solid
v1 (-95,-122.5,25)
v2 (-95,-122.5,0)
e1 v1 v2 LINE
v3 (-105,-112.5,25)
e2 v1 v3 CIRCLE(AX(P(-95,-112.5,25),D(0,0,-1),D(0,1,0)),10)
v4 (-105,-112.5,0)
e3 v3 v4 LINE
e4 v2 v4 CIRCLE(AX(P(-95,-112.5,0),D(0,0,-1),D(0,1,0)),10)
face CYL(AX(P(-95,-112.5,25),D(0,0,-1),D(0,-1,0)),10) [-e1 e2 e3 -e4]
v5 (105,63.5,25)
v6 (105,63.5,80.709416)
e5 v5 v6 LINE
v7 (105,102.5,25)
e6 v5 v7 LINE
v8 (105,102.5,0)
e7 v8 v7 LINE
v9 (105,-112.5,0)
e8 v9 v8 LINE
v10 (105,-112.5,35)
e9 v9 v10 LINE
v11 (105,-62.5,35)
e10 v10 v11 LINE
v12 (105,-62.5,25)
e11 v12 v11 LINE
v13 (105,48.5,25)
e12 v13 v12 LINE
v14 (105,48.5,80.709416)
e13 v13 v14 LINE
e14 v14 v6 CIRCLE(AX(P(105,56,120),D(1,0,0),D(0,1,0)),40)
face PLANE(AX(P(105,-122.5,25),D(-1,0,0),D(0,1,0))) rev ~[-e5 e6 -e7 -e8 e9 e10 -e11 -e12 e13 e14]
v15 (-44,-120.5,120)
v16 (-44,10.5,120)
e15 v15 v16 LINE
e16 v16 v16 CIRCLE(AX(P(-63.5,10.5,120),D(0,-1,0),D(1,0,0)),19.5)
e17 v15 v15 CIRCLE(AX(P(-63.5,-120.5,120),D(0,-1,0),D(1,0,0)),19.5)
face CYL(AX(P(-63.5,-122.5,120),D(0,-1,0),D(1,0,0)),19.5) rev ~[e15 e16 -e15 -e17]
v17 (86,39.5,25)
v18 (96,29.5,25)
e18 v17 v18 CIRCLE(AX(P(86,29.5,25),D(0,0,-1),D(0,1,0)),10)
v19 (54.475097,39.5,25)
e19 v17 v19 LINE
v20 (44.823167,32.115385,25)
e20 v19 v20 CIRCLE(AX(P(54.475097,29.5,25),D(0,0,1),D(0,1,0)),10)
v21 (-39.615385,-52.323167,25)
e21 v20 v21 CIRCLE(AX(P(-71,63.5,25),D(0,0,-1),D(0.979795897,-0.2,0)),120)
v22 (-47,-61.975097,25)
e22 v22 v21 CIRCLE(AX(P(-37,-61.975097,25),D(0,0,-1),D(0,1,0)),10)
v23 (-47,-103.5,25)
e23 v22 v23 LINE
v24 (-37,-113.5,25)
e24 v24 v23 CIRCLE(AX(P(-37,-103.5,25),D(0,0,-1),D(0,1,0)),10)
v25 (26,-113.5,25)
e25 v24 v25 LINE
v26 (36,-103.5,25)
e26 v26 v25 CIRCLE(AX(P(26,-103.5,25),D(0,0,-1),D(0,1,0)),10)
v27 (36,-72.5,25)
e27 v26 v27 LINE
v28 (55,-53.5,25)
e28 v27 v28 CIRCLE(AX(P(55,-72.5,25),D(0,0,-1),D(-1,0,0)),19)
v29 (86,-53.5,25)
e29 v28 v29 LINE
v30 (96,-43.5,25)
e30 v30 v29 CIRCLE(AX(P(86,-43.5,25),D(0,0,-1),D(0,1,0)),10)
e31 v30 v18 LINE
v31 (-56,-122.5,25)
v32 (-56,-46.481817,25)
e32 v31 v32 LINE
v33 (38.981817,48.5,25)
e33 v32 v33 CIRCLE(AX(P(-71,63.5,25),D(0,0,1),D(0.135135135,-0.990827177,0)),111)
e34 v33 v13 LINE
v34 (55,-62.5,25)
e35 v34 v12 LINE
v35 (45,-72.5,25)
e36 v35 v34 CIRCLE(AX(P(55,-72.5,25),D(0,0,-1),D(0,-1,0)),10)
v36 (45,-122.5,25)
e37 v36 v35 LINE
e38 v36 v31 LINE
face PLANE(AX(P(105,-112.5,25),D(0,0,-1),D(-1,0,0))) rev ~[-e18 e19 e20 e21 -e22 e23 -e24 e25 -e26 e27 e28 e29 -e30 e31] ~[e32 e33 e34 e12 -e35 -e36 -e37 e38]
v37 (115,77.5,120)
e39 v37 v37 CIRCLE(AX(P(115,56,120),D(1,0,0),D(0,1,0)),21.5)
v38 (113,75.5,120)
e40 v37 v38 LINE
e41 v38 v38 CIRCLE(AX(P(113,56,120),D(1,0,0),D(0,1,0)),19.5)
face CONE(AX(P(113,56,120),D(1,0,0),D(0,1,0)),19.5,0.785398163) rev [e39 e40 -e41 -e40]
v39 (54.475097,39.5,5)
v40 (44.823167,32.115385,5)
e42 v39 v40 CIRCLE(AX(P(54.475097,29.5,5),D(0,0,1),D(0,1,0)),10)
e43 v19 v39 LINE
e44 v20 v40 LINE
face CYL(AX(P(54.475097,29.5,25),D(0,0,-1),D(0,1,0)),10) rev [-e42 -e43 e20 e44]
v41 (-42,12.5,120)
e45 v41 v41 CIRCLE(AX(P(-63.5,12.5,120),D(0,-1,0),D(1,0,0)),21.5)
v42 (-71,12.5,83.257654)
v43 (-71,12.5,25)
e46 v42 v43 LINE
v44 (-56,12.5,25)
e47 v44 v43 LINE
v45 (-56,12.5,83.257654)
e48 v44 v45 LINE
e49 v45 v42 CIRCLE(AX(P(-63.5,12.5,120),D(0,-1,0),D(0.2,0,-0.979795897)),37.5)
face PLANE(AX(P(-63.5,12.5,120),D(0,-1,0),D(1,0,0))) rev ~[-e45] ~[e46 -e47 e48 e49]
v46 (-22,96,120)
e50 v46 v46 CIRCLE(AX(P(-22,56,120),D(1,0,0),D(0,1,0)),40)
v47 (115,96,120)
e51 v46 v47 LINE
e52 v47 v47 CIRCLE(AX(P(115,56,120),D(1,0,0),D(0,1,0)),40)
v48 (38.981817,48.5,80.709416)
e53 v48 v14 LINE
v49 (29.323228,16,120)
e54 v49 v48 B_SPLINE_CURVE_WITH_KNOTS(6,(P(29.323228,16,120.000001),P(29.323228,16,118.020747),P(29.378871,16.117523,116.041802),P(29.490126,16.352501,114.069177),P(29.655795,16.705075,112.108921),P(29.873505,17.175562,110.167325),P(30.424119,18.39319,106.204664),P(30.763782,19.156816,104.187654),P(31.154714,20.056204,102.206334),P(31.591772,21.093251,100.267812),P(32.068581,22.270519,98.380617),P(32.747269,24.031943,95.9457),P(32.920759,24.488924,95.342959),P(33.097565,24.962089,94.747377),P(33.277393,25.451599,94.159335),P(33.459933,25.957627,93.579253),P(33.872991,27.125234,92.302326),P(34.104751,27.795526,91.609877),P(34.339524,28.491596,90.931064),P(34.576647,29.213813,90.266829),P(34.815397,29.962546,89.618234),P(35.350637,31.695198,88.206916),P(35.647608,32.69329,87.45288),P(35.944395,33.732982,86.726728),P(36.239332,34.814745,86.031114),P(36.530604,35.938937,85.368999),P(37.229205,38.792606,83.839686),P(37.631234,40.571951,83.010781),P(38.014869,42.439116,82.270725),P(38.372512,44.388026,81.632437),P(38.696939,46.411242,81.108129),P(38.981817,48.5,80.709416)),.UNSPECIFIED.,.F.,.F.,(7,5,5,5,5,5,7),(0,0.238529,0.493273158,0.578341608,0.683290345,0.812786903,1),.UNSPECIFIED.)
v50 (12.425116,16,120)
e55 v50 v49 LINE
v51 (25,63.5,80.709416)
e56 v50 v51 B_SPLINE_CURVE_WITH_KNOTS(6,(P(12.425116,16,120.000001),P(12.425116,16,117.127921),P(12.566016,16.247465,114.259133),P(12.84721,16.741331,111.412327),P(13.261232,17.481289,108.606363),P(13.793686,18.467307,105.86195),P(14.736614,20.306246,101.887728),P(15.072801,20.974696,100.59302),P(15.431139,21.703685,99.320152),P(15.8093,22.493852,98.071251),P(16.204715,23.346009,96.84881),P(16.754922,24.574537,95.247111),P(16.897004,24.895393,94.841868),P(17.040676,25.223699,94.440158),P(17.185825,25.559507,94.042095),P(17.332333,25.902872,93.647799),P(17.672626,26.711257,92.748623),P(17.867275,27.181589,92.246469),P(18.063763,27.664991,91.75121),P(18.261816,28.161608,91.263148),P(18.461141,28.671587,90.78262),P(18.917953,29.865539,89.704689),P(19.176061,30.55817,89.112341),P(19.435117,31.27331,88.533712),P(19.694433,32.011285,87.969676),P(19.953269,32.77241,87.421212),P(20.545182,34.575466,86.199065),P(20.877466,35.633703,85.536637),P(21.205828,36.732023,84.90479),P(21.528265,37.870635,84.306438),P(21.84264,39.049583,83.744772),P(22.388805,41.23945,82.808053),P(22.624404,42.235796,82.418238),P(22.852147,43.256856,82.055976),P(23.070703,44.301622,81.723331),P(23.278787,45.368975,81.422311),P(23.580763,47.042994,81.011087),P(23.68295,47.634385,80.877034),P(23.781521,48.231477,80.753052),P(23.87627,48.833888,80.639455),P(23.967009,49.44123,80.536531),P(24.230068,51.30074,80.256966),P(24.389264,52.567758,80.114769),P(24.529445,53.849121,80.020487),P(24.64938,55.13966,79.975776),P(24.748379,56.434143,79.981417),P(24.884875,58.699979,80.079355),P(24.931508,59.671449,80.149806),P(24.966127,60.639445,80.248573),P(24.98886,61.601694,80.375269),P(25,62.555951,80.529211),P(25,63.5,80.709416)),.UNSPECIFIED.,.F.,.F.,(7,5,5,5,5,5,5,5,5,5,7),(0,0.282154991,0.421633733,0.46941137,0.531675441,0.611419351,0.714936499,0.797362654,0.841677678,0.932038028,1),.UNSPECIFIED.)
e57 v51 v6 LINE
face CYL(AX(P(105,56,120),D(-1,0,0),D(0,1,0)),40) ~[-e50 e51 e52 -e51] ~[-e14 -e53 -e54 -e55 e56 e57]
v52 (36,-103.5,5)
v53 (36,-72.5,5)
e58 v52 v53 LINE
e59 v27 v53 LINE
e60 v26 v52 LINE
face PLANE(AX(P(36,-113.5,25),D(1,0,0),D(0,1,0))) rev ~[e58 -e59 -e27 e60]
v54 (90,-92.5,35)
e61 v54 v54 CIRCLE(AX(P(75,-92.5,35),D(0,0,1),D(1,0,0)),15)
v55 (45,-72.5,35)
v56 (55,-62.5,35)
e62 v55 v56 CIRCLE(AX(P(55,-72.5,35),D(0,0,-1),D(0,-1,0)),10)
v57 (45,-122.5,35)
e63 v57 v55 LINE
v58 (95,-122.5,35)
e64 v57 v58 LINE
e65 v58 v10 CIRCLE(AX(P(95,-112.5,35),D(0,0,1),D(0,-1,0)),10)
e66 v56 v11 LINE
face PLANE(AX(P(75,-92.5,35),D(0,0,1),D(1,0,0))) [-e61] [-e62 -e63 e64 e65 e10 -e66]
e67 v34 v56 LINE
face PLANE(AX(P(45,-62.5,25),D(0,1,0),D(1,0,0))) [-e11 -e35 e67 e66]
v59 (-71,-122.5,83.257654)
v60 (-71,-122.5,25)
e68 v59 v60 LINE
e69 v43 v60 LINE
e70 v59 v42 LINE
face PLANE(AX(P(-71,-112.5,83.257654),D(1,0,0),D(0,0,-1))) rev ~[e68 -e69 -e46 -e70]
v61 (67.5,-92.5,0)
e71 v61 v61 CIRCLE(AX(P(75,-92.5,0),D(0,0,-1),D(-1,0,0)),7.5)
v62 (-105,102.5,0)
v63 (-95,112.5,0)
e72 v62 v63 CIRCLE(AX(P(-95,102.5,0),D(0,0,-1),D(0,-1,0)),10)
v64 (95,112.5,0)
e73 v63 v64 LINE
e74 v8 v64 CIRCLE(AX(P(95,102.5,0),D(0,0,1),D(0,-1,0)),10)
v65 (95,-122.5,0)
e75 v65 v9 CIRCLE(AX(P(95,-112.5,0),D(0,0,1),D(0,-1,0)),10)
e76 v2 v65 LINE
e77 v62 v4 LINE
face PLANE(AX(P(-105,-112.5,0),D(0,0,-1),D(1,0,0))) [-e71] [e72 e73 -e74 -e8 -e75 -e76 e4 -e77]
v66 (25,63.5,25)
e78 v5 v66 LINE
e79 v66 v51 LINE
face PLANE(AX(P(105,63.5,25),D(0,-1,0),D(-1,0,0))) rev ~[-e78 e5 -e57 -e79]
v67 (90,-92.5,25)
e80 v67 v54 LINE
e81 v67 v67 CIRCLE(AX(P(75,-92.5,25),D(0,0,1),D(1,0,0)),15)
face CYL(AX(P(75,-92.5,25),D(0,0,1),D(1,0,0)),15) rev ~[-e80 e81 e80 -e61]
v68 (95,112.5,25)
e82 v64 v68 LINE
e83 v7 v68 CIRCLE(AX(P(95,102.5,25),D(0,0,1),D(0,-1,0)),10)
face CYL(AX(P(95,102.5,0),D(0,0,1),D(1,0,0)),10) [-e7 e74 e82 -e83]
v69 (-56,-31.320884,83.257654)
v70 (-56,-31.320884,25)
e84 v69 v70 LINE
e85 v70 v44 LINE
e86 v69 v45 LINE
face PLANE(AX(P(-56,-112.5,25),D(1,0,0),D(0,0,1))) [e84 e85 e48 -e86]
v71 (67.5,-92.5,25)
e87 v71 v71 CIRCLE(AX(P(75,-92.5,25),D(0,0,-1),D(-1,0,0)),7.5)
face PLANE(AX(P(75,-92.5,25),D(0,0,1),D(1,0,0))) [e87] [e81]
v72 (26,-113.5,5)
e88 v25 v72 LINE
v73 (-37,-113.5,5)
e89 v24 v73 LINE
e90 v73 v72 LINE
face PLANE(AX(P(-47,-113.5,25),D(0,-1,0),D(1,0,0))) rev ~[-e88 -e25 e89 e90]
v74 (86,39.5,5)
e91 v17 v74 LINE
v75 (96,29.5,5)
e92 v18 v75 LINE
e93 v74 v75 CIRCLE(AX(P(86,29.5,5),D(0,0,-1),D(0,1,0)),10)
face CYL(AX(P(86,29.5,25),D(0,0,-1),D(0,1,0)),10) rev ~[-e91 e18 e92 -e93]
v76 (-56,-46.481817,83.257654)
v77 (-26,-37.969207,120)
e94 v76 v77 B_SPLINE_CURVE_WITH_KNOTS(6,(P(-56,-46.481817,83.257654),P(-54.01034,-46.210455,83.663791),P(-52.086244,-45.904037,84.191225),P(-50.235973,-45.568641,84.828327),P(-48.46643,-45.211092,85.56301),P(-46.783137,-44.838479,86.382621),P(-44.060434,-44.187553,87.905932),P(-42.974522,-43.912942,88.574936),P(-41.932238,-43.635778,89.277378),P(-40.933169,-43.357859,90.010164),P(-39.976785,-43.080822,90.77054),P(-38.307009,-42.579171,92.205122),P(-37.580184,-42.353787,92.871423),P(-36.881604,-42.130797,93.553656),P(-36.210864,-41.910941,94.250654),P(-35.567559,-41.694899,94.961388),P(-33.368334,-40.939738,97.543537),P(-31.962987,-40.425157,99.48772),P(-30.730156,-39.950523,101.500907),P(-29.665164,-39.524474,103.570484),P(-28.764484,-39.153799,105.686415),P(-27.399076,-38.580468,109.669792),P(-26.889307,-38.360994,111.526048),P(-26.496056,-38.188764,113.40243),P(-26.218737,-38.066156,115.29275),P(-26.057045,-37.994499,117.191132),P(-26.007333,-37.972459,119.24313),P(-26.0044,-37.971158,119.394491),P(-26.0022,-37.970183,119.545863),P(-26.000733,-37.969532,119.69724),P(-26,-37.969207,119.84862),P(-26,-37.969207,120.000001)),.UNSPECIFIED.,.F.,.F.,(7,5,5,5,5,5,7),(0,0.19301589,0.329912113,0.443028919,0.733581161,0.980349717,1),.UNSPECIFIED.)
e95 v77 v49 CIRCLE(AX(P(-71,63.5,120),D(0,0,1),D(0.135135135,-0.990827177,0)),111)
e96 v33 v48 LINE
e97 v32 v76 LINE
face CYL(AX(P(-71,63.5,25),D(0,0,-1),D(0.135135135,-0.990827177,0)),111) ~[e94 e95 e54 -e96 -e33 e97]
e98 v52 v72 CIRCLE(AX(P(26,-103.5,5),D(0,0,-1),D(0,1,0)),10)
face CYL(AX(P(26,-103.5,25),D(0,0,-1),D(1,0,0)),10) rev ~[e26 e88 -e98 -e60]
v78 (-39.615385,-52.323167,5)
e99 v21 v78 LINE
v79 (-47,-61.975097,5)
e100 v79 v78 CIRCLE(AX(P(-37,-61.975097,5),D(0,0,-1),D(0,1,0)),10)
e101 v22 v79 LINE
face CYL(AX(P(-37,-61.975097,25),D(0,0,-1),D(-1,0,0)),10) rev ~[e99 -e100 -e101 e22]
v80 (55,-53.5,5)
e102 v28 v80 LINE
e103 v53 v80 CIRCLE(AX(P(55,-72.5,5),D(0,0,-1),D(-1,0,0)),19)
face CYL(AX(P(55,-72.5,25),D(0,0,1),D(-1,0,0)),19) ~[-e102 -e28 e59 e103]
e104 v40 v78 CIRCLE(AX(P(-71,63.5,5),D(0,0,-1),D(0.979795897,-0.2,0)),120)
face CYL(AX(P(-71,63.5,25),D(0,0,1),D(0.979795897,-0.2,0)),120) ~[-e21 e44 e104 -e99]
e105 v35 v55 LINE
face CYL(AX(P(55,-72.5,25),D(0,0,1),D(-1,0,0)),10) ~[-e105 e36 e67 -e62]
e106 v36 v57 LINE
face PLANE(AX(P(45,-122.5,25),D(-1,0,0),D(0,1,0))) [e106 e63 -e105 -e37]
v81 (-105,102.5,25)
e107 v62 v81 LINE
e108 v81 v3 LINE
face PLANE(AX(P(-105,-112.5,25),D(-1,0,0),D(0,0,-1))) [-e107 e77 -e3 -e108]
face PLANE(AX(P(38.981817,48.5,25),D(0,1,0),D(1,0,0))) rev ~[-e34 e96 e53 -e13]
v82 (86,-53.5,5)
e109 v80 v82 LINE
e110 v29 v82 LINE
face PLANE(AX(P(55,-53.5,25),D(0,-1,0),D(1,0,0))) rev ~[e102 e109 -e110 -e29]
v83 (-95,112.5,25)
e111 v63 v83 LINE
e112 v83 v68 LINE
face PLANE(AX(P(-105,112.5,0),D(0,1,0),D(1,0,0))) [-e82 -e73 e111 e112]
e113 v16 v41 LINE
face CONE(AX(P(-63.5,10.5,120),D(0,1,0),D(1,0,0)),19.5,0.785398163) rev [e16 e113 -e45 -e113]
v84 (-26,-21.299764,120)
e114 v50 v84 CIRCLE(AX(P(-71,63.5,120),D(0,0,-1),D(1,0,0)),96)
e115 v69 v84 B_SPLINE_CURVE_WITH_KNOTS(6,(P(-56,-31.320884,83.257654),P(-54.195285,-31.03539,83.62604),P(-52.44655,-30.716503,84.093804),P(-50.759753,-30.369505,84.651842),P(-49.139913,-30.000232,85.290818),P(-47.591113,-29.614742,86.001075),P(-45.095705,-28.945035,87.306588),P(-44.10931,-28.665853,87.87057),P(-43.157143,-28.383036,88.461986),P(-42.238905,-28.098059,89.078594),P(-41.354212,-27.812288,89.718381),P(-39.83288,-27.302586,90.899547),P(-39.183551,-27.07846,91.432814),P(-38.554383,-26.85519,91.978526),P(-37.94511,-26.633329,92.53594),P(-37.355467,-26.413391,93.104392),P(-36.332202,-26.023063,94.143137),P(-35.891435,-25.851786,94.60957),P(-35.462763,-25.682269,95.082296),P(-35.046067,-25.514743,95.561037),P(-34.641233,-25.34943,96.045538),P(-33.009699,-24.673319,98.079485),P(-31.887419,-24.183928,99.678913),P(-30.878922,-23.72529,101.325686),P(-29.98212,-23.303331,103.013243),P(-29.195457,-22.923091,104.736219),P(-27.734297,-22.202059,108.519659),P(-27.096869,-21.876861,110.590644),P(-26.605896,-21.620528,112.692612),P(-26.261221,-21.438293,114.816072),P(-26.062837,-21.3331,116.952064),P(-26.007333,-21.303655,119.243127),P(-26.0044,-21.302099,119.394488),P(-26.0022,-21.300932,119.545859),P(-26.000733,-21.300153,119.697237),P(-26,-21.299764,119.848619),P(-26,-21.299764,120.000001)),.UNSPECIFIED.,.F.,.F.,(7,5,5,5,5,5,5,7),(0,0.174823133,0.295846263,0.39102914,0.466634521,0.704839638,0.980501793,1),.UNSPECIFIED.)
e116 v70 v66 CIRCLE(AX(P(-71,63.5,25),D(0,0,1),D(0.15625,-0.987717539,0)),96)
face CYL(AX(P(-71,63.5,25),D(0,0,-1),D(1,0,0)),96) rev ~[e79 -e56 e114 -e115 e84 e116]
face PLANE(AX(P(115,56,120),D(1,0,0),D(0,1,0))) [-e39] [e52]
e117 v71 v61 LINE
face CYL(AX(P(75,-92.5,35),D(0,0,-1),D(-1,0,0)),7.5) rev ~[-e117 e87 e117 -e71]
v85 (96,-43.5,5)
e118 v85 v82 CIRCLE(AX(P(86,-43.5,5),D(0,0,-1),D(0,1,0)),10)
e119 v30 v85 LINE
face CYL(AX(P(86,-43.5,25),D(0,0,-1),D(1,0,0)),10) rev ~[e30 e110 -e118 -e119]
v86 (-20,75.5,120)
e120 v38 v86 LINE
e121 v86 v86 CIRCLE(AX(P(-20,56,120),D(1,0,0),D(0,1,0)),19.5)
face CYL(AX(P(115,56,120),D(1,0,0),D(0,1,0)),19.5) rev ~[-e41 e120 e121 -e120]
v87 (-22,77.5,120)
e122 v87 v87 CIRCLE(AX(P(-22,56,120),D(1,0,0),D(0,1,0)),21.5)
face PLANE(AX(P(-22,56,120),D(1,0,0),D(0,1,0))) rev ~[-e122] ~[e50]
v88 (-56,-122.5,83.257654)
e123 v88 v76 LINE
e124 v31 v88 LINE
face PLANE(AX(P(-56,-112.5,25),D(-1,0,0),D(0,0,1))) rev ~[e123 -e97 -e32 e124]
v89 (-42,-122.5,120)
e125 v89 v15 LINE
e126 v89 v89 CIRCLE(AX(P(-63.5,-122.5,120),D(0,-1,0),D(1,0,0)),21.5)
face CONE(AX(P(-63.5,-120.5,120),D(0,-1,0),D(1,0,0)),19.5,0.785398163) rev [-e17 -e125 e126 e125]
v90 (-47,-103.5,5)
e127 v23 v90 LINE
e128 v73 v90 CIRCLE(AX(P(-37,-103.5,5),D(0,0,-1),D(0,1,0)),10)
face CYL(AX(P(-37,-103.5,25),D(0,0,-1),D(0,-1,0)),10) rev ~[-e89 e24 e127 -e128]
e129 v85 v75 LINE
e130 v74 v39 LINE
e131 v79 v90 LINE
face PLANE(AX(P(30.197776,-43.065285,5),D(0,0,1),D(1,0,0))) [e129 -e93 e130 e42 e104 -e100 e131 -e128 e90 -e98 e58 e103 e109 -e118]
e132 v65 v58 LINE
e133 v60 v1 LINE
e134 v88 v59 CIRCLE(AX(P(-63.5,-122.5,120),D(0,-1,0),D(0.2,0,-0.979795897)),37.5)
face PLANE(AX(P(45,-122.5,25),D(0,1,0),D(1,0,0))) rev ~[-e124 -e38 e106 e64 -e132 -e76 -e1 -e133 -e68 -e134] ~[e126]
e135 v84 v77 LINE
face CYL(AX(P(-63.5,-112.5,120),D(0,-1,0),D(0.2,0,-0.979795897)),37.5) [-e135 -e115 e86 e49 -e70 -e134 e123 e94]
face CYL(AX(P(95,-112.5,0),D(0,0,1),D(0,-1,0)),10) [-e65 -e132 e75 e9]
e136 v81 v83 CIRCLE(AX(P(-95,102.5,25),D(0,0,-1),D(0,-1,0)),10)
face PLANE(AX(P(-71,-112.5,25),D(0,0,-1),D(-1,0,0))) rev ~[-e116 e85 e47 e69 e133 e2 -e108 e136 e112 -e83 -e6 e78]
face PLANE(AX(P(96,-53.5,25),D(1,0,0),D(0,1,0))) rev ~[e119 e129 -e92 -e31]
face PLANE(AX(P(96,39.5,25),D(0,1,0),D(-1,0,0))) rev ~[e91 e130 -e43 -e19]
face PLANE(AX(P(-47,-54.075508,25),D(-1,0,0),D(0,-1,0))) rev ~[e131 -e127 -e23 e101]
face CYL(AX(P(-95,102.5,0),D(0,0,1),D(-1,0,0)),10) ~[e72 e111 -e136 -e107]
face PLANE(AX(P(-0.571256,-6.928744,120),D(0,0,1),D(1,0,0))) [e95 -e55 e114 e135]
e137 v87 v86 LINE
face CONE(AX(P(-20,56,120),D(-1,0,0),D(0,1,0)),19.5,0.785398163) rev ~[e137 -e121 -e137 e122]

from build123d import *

# Parameters (mm, degrees)
F0_W            = 210
F0_H            = 225
F1_DEPTH        = 25
F3_DEPTH        = 95
F4_R            = 37.5
F5_DEPTH        = 10
F5_DEPTH_BACK   = 125
F6_R            = 40
F7_DEPTH        = 10
F7_DEPTH_BACK   = 127
F8_W            = 60
F8_H            = 60
F9_DEPTH        = 10
F10_R           = 10
F12_DEPTH       = 20
F14_D           = 15
F14_CBORE_D     = 30
F14_CBORE_DEPTH = 10
F15_R           = 10
F16_R           = 19.5
F17_DEPTH       = 235.001
F18_R           = 19.5
F19_DEPTH       = 220.001
F20_SIZE        = 2
F21_R           = 10


with BuildPart() as f1:
    # F0 (on Top) → F1 (new body)
    with BuildSketch(Plane.XY):
        Rectangle(F0_W, F0_H)
    extrude(amount=F1_DEPTH)

    # F2 (on face) → F3 (join)
    with BuildSketch(Plane.XY.offset(25)):
        with BuildLine():
            ThreePointArc((25, 63.5), (-3.1177490061, -4.3822509939), (-71, -32.5))
            Line((-71, -32.5), (-71, -112.5))
            Line((-71, -112.5), (-56, -112.5))
            Line((-56, -112.5), (-56, -46.4818166789))
            ThreePointArc((-56, -46.4818166789), (7.4888527117, -14.9888527117), (38.9818166789, 48.5))
            Line((38.9818166789, 48.5), (105, 48.5))
            Line((105, 48.5), (105, 63.5))
            Line((105, 63.5), (25, 63.5))
        make_face()
    extrude(amount=F3_DEPTH)

    # F4 (on face) → F5 (join, two sides)
    with BuildSketch(Plane.XZ.offset(112.5)) as f5_sk:
        with Locations((-63.5, 120)):
            Circle(F4_R)
        with BuildLine():
            ThreePointArc((-56, 83.2576538583), (-63.5, 82.5), (-71, 83.2576538583))
            Line((-71, 83.2576538583), (-71, 25))
            Line((-71, 25), (-105, 25))
            Line((-105, 25), (-105, 0))
            Line((-105, 0), (105, 0))
            Line((105, 0), (105, 25))
            Line((105, 25), (-56, 25))
            Line((-56, 25), (-56, 83.2576538583))
        make_face()
    extrude(amount=F5_DEPTH)
    extrude(f5_sk.sketch, amount=-F5_DEPTH_BACK)

    # F6 (on face) → F7 (join, two sides)
    with BuildSketch(Plane.YZ.offset(105)) as f7_sk:
        with Locations((56, 120)):
            Circle(F6_R)
        with BuildLine():
            ThreePointArc((63.5, 80.7094158862), (86.8220700148, 94.504902432), (96, 120))
            ThreePointArc((96, 120), (30.504902432, 150.8220700148), (48.5, 80.7094158862))
            Line((48.5, 80.7094158862), (48.5, 120))
            Line((48.5, 120), (63.5, 120))
            Line((63.5, 120), (63.5, 80.7094158862))
        make_face()
    extrude(amount=F7_DEPTH)
    extrude(f7_sk.sketch, amount=-F7_DEPTH_BACK)

    # F8 (on face) → F9 (join)
    with BuildSketch(Plane.XY.offset(25)):
        with Locations((75, -92.5)):
            Rectangle(F8_W, F8_H)
    extrude(amount=F9_DEPTH)

    # F10
    f10_edges = [f1.edges().sort_by_distance(p)[0] for p in [
        (45, -62.5, 30),
    ]]
    fillet(f10_edges, radius=F10_R)

    # F11 (on face) → F12 (cut)
    with BuildSketch(Plane.XY.offset(25)):
        with BuildLine():
            ThreePointArc((46.5755076536, 39.5), (13.8528137424, -21.3528137424), (-47, -54.0755076536))
            Line((-47, -54.0755076536), (-47, -113.5))
            Line((-47, -113.5), (36, -113.5))
            Line((36, -113.5), (36, -72.5))
            ThreePointArc((36, -72.5), (41.5649711575, -59.0649711575), (55, -53.5))
            Line((55, -53.5), (96, -53.5))
            Line((96, -53.5), (96, 39.5))
            Line((96, 39.5), (46.5755076536, 39.5))
        make_face()
    extrude(amount=-F12_DEPTH, mode=Mode.SUBTRACT)

    # F14 (through all)
    with Locations(Plane.XY.offset(35)):
        with Locations((75, -92.5)):
            CounterBoreHole(F14_D / 2, F14_CBORE_D / 2, F14_CBORE_DEPTH)

    # F15
    f15_edges = [f1.edges().sort_by_distance(p)[0] for p in [
        (-47, -54.075508, 15),
        (46.575508, 39.5, 15),
        (-47, -113.5, 15),
        (96, 39.5, 15),
        (96, -53.5, 15),
        (36, -113.5, 15),
    ]]
    fillet(f15_edges, radius=F15_R)

    # F16 (on face) → F17 (cut, through all)
    with BuildSketch(Plane.XZ.offset(122.5)):
        with Locations((-63.5, 120)):
            Circle(F16_R)
    extrude(amount=-F17_DEPTH, mode=Mode.SUBTRACT)

    # F18 (on face) → F19 (cut, through all)
    with BuildSketch(Plane.YZ.offset(115)):
        with Locations((56, 120)):
            Circle(F18_R)
    extrude(amount=-F19_DEPTH, mode=Mode.SUBTRACT)

    # F20
    f20_edges = [f1.edges().sort_by_distance(p)[0] for p in [
        (115, 36.5, 120),
        (-83, -122.5, 120),
        (-22, 36.5, 120),
        (-83, 12.5, 120),
    ]]
    chamfer(f20_edges, length=F20_SIZE)

    # F21
    f21_edges = [f1.edges().sort_by_distance(p)[0] for p in [
        (105, 112.5, 12.5),
        (105, -122.5, 17.5),
        (-105, 112.5, 12.5),
        (-105, -122.5, 12.5),
    ]]
    fillet(f21_edges, radius=F21_R)


solid = f1.part
